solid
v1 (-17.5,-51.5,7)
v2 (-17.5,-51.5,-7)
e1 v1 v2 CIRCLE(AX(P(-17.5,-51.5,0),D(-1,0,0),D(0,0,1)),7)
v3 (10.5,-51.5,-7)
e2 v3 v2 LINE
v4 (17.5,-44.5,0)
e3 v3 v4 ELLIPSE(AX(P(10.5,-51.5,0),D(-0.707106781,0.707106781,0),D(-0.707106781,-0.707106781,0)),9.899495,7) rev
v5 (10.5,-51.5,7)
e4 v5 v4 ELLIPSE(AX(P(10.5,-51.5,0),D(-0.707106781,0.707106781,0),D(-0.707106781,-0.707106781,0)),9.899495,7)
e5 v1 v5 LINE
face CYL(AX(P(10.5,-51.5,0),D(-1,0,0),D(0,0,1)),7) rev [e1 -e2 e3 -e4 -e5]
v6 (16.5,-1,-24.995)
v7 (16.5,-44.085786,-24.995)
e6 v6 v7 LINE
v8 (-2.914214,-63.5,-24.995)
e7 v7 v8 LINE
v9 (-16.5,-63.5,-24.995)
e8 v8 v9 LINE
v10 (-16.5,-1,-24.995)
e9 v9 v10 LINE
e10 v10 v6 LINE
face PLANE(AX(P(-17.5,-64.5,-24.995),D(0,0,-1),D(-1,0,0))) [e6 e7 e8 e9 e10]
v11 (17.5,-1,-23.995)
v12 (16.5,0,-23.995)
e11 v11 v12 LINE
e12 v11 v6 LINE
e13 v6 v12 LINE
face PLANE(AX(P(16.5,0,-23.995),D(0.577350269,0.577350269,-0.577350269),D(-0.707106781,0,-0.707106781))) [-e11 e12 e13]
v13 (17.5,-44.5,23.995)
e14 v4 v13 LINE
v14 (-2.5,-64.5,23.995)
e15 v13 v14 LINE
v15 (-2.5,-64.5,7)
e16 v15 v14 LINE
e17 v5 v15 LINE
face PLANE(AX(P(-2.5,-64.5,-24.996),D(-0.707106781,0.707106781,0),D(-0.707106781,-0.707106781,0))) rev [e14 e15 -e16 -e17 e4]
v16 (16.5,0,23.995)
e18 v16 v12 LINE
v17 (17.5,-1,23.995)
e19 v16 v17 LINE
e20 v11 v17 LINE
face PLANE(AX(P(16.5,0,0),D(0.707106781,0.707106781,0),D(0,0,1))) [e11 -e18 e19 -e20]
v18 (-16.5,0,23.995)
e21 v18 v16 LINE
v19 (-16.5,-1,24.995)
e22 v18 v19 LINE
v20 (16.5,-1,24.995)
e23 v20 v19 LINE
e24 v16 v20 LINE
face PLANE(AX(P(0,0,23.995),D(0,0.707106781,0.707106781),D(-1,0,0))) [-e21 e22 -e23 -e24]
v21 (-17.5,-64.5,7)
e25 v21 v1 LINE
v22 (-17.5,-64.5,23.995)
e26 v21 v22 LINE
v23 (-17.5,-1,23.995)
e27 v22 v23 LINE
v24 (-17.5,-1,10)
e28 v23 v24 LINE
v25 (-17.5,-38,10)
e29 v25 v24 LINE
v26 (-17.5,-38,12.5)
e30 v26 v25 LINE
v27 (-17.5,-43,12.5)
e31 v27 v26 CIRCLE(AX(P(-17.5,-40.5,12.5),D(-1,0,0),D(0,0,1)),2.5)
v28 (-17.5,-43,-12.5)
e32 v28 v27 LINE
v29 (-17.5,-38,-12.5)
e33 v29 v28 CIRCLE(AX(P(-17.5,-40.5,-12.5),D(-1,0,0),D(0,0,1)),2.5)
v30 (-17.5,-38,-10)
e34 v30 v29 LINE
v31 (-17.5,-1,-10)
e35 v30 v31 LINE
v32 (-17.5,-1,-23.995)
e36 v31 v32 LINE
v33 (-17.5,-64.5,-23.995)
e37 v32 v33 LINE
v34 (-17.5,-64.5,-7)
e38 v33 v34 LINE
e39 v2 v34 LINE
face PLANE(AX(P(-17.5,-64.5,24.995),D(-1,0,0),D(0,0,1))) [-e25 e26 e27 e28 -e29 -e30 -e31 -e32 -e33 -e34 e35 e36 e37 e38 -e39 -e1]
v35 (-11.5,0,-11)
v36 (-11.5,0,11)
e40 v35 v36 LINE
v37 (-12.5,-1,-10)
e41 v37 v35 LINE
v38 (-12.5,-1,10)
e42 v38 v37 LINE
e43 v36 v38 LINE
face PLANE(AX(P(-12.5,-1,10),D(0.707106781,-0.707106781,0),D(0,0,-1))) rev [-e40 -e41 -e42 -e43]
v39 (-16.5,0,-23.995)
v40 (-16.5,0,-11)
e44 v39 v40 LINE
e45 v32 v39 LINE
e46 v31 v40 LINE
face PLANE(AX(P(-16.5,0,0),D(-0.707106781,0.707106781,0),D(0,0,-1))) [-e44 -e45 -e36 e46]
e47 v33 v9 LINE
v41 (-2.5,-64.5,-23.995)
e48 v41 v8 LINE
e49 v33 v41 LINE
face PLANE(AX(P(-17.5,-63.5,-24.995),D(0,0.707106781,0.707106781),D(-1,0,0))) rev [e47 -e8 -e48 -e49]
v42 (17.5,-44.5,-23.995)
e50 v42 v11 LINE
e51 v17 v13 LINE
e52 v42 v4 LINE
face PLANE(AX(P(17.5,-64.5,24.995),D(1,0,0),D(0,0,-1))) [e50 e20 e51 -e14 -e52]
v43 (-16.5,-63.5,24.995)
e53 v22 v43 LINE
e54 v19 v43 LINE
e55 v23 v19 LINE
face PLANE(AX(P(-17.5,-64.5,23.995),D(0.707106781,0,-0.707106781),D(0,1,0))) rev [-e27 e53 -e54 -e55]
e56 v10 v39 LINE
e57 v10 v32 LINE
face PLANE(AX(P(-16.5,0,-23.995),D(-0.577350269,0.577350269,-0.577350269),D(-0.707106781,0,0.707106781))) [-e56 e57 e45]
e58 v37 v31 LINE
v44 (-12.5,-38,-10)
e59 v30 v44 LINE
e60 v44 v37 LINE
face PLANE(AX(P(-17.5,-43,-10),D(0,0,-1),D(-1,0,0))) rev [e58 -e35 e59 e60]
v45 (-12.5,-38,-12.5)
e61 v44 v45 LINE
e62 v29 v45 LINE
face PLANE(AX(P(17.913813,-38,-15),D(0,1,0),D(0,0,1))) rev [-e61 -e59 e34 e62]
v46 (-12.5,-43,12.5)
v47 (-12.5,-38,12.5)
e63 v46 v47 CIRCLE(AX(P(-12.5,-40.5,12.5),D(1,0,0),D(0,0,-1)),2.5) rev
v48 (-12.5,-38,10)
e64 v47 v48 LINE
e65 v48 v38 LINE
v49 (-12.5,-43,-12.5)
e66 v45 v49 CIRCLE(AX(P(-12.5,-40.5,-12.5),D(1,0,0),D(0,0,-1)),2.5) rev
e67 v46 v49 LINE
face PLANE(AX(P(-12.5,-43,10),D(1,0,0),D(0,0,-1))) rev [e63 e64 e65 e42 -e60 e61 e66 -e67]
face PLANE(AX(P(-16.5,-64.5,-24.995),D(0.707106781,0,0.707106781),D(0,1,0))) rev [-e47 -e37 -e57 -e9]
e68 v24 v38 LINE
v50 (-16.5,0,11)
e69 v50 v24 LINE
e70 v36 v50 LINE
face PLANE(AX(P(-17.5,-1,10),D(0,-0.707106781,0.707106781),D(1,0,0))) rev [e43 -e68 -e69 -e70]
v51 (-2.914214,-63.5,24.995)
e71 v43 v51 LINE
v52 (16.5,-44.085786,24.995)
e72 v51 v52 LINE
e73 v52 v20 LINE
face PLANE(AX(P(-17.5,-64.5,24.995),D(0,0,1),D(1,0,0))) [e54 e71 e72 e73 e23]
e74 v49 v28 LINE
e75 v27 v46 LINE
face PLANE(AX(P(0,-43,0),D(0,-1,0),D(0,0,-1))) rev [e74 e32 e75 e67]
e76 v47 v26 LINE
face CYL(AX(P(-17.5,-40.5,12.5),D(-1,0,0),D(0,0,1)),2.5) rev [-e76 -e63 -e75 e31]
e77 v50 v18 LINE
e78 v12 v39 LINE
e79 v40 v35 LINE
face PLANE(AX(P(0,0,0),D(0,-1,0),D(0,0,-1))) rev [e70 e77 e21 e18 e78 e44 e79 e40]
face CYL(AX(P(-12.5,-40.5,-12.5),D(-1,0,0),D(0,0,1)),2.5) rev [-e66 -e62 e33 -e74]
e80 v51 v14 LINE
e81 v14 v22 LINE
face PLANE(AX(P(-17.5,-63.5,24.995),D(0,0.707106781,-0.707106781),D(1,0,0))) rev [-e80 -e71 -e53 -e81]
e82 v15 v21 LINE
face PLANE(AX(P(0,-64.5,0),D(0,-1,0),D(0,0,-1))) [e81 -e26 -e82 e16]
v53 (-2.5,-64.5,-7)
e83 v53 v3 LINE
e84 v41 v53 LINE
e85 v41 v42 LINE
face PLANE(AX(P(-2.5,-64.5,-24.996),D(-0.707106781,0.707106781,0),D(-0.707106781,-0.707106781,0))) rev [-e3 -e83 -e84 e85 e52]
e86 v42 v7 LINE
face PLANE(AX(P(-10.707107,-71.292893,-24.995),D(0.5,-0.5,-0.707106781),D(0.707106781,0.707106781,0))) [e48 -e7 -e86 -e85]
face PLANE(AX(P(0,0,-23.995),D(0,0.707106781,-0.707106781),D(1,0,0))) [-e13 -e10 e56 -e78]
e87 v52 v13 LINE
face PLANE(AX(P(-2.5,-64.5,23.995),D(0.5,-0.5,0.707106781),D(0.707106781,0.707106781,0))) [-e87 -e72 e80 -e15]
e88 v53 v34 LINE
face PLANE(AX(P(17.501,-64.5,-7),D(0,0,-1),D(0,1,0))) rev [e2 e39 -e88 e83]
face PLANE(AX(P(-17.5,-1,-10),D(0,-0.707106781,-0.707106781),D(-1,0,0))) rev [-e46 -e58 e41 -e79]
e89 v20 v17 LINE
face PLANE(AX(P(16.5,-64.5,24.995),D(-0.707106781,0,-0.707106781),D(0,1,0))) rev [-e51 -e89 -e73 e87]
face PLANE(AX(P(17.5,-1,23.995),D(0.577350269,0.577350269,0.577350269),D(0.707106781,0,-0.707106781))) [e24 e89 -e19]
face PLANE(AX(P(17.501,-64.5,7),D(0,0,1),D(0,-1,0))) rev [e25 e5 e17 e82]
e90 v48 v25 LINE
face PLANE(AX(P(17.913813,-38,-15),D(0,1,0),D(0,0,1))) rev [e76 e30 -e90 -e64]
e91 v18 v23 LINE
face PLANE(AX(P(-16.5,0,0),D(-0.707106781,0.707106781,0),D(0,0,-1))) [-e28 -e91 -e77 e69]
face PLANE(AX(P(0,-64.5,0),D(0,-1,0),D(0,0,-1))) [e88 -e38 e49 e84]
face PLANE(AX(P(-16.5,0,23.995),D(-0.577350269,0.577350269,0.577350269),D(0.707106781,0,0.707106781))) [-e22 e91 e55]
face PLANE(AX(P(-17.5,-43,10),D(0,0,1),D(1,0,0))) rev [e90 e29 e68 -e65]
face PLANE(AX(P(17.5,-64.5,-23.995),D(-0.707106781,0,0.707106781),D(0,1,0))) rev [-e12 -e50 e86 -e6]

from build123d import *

# Parameters (mm, degrees)
SKETCH1_W           = 35
SKETCH1_H           = 49.99
BOSS_EXTRUDE1_DEPTH = 64.5
CUT_EXTRUDE1_REACH  = 85.46
CUT_EXTRUDE2_REACH  = 79.524
SKETCH3_W           = 14
SKETCH3_H           = 20
FILLET1_R           = 7
SKETCH4_W           = 5
SKETCH4_H           = 20
CUT_EXTRUDE3_DEPTH  = 43
SKETCH5_W           = 30
SKETCH5_H           = 5
CUT_EXTRUDE4_DEPTH  = 5
FILLET5_R           = 2.5
FILLET6_R           = 2.5
CHAMFER1_SIZE       = 1


with BuildPart() as part:
    # Sketch1 → Boss-Extrude1 (new body)
    with BuildSketch(Plane(origin=(0, 0, 0), x_dir=(1, 0, 0), z_dir=(0, 1, 0))):
        Rectangle(SKETCH1_W, SKETCH1_H)
    extrude(amount=-BOSS_EXTRUDE1_DEPTH)

    # Sketch2 → Cut-Extrude1 (cut, up to next)
    with BuildSketch(Plane.XY.offset(24.995), mode=Mode.PRIVATE) as cut_extrude1_sk1:
        Polygon((-2.5, -64.5), (17.5, -44.5), (17.5, -64.5), align=None)
    cut_extrude1_tool1 = extrude(cut_extrude1_sk1.sketch, amount=-CUT_EXTRUDE1_REACH, mode=Mode.PRIVATE) & part.part
    add(cut_extrude1_tool1.solids().sort_by_distance((10.833333, -57.833333, 24.995))[0], mode=Mode.SUBTRACT)

    # Sketch3 → Cut-Extrude2 (cut, up to next)
    with BuildSketch(Plane.ZY.offset(17.5), mode=Mode.PRIVATE) as cut_extrude2_sk1:
        with Locations((0, -54.5)):
            Rectangle(SKETCH3_W, SKETCH3_H)
    cut_extrude2_tool1 = extrude(cut_extrude2_sk1.sketch, amount=-CUT_EXTRUDE2_REACH, mode=Mode.PRIVATE) & part.part
    add(cut_extrude2_tool1.solids().sort_by_distance((-17.5, -54.5, 0))[0], mode=Mode.SUBTRACT)

    # Fillet1
    fillet1_edges = [part.edges().sort_by_distance(p)[0] for p in [
        (0, -44.5, -7),
        (0, -44.5, 7),
    ]]
    fillet(fillet1_edges, radius=FILLET1_R - 0.0001)  # a hair under: the kernel refuses the full size

    # Sketch4 → Cut-Extrude3 (cut)
    with BuildSketch(Plane(origin=(0, 0, 0), x_dir=(1, 0, 0), z_dir=(0, 1, 0))):
        with Locations((-15, 0)):
            Rectangle(SKETCH4_W, SKETCH4_H)
    extrude(amount=-CUT_EXTRUDE3_DEPTH, mode=Mode.SUBTRACT)

    # Sketch5 → Cut-Extrude4 (cut)
    with BuildSketch(Plane.ZY.offset(17.5)):
        with Locations((0, -40.5)):
            Rectangle(SKETCH5_W, SKETCH5_H)
    extrude(amount=-CUT_EXTRUDE4_DEPTH, mode=Mode.SUBTRACT)

    # Fillet5
    fillet5_edges = [part.edges().sort_by_distance(p)[0] for p in [
        (-15, -38, -15),
        (-15, -43, -15),
    ]]
    fillet(fillet5_edges, radius=FILLET5_R - 0.0001)  # a hair under: the kernel refuses the full size

    # Fillet6
    fillet6_edges = [part.edges().sort_by_distance(p)[0] for p in [
        (-15, -43, 15),
        (-15, -38, 15),
    ]]
    fillet(fillet6_edges, radius=FILLET6_R - 0.0001)  # a hair under: the kernel refuses the full size

    # Chamfer1
    chamfer1_edges = [part.edges().sort_by_distance(p)[0] for p in [
        (-10, -64.5, -24.995),
        (17.5, -22.25, -24.995),
        (17.5, -22.25, 24.995),
        (-10, -64.5, 24.995),
        (7.5, -54.5, -24.995),
        (7.5, -54.5, 24.995),
        (0, 0, 24.995),
        (-17.5, 0, -17.4975),
        (-17.5, 0, 17.4975),
        (0, 0, -24.995),
        (17.5, 0, 0),
        (-15, 0, 10),
        (-12.5, 0, 0),
        (-15, 0, -10),
        (-17.5, -32.25, 24.995),
        (-17.5, -32.25, -24.995),
    ]]
    chamfer(chamfer1_edges, length=CHAMFER1_SIZE)


solid = part.part
